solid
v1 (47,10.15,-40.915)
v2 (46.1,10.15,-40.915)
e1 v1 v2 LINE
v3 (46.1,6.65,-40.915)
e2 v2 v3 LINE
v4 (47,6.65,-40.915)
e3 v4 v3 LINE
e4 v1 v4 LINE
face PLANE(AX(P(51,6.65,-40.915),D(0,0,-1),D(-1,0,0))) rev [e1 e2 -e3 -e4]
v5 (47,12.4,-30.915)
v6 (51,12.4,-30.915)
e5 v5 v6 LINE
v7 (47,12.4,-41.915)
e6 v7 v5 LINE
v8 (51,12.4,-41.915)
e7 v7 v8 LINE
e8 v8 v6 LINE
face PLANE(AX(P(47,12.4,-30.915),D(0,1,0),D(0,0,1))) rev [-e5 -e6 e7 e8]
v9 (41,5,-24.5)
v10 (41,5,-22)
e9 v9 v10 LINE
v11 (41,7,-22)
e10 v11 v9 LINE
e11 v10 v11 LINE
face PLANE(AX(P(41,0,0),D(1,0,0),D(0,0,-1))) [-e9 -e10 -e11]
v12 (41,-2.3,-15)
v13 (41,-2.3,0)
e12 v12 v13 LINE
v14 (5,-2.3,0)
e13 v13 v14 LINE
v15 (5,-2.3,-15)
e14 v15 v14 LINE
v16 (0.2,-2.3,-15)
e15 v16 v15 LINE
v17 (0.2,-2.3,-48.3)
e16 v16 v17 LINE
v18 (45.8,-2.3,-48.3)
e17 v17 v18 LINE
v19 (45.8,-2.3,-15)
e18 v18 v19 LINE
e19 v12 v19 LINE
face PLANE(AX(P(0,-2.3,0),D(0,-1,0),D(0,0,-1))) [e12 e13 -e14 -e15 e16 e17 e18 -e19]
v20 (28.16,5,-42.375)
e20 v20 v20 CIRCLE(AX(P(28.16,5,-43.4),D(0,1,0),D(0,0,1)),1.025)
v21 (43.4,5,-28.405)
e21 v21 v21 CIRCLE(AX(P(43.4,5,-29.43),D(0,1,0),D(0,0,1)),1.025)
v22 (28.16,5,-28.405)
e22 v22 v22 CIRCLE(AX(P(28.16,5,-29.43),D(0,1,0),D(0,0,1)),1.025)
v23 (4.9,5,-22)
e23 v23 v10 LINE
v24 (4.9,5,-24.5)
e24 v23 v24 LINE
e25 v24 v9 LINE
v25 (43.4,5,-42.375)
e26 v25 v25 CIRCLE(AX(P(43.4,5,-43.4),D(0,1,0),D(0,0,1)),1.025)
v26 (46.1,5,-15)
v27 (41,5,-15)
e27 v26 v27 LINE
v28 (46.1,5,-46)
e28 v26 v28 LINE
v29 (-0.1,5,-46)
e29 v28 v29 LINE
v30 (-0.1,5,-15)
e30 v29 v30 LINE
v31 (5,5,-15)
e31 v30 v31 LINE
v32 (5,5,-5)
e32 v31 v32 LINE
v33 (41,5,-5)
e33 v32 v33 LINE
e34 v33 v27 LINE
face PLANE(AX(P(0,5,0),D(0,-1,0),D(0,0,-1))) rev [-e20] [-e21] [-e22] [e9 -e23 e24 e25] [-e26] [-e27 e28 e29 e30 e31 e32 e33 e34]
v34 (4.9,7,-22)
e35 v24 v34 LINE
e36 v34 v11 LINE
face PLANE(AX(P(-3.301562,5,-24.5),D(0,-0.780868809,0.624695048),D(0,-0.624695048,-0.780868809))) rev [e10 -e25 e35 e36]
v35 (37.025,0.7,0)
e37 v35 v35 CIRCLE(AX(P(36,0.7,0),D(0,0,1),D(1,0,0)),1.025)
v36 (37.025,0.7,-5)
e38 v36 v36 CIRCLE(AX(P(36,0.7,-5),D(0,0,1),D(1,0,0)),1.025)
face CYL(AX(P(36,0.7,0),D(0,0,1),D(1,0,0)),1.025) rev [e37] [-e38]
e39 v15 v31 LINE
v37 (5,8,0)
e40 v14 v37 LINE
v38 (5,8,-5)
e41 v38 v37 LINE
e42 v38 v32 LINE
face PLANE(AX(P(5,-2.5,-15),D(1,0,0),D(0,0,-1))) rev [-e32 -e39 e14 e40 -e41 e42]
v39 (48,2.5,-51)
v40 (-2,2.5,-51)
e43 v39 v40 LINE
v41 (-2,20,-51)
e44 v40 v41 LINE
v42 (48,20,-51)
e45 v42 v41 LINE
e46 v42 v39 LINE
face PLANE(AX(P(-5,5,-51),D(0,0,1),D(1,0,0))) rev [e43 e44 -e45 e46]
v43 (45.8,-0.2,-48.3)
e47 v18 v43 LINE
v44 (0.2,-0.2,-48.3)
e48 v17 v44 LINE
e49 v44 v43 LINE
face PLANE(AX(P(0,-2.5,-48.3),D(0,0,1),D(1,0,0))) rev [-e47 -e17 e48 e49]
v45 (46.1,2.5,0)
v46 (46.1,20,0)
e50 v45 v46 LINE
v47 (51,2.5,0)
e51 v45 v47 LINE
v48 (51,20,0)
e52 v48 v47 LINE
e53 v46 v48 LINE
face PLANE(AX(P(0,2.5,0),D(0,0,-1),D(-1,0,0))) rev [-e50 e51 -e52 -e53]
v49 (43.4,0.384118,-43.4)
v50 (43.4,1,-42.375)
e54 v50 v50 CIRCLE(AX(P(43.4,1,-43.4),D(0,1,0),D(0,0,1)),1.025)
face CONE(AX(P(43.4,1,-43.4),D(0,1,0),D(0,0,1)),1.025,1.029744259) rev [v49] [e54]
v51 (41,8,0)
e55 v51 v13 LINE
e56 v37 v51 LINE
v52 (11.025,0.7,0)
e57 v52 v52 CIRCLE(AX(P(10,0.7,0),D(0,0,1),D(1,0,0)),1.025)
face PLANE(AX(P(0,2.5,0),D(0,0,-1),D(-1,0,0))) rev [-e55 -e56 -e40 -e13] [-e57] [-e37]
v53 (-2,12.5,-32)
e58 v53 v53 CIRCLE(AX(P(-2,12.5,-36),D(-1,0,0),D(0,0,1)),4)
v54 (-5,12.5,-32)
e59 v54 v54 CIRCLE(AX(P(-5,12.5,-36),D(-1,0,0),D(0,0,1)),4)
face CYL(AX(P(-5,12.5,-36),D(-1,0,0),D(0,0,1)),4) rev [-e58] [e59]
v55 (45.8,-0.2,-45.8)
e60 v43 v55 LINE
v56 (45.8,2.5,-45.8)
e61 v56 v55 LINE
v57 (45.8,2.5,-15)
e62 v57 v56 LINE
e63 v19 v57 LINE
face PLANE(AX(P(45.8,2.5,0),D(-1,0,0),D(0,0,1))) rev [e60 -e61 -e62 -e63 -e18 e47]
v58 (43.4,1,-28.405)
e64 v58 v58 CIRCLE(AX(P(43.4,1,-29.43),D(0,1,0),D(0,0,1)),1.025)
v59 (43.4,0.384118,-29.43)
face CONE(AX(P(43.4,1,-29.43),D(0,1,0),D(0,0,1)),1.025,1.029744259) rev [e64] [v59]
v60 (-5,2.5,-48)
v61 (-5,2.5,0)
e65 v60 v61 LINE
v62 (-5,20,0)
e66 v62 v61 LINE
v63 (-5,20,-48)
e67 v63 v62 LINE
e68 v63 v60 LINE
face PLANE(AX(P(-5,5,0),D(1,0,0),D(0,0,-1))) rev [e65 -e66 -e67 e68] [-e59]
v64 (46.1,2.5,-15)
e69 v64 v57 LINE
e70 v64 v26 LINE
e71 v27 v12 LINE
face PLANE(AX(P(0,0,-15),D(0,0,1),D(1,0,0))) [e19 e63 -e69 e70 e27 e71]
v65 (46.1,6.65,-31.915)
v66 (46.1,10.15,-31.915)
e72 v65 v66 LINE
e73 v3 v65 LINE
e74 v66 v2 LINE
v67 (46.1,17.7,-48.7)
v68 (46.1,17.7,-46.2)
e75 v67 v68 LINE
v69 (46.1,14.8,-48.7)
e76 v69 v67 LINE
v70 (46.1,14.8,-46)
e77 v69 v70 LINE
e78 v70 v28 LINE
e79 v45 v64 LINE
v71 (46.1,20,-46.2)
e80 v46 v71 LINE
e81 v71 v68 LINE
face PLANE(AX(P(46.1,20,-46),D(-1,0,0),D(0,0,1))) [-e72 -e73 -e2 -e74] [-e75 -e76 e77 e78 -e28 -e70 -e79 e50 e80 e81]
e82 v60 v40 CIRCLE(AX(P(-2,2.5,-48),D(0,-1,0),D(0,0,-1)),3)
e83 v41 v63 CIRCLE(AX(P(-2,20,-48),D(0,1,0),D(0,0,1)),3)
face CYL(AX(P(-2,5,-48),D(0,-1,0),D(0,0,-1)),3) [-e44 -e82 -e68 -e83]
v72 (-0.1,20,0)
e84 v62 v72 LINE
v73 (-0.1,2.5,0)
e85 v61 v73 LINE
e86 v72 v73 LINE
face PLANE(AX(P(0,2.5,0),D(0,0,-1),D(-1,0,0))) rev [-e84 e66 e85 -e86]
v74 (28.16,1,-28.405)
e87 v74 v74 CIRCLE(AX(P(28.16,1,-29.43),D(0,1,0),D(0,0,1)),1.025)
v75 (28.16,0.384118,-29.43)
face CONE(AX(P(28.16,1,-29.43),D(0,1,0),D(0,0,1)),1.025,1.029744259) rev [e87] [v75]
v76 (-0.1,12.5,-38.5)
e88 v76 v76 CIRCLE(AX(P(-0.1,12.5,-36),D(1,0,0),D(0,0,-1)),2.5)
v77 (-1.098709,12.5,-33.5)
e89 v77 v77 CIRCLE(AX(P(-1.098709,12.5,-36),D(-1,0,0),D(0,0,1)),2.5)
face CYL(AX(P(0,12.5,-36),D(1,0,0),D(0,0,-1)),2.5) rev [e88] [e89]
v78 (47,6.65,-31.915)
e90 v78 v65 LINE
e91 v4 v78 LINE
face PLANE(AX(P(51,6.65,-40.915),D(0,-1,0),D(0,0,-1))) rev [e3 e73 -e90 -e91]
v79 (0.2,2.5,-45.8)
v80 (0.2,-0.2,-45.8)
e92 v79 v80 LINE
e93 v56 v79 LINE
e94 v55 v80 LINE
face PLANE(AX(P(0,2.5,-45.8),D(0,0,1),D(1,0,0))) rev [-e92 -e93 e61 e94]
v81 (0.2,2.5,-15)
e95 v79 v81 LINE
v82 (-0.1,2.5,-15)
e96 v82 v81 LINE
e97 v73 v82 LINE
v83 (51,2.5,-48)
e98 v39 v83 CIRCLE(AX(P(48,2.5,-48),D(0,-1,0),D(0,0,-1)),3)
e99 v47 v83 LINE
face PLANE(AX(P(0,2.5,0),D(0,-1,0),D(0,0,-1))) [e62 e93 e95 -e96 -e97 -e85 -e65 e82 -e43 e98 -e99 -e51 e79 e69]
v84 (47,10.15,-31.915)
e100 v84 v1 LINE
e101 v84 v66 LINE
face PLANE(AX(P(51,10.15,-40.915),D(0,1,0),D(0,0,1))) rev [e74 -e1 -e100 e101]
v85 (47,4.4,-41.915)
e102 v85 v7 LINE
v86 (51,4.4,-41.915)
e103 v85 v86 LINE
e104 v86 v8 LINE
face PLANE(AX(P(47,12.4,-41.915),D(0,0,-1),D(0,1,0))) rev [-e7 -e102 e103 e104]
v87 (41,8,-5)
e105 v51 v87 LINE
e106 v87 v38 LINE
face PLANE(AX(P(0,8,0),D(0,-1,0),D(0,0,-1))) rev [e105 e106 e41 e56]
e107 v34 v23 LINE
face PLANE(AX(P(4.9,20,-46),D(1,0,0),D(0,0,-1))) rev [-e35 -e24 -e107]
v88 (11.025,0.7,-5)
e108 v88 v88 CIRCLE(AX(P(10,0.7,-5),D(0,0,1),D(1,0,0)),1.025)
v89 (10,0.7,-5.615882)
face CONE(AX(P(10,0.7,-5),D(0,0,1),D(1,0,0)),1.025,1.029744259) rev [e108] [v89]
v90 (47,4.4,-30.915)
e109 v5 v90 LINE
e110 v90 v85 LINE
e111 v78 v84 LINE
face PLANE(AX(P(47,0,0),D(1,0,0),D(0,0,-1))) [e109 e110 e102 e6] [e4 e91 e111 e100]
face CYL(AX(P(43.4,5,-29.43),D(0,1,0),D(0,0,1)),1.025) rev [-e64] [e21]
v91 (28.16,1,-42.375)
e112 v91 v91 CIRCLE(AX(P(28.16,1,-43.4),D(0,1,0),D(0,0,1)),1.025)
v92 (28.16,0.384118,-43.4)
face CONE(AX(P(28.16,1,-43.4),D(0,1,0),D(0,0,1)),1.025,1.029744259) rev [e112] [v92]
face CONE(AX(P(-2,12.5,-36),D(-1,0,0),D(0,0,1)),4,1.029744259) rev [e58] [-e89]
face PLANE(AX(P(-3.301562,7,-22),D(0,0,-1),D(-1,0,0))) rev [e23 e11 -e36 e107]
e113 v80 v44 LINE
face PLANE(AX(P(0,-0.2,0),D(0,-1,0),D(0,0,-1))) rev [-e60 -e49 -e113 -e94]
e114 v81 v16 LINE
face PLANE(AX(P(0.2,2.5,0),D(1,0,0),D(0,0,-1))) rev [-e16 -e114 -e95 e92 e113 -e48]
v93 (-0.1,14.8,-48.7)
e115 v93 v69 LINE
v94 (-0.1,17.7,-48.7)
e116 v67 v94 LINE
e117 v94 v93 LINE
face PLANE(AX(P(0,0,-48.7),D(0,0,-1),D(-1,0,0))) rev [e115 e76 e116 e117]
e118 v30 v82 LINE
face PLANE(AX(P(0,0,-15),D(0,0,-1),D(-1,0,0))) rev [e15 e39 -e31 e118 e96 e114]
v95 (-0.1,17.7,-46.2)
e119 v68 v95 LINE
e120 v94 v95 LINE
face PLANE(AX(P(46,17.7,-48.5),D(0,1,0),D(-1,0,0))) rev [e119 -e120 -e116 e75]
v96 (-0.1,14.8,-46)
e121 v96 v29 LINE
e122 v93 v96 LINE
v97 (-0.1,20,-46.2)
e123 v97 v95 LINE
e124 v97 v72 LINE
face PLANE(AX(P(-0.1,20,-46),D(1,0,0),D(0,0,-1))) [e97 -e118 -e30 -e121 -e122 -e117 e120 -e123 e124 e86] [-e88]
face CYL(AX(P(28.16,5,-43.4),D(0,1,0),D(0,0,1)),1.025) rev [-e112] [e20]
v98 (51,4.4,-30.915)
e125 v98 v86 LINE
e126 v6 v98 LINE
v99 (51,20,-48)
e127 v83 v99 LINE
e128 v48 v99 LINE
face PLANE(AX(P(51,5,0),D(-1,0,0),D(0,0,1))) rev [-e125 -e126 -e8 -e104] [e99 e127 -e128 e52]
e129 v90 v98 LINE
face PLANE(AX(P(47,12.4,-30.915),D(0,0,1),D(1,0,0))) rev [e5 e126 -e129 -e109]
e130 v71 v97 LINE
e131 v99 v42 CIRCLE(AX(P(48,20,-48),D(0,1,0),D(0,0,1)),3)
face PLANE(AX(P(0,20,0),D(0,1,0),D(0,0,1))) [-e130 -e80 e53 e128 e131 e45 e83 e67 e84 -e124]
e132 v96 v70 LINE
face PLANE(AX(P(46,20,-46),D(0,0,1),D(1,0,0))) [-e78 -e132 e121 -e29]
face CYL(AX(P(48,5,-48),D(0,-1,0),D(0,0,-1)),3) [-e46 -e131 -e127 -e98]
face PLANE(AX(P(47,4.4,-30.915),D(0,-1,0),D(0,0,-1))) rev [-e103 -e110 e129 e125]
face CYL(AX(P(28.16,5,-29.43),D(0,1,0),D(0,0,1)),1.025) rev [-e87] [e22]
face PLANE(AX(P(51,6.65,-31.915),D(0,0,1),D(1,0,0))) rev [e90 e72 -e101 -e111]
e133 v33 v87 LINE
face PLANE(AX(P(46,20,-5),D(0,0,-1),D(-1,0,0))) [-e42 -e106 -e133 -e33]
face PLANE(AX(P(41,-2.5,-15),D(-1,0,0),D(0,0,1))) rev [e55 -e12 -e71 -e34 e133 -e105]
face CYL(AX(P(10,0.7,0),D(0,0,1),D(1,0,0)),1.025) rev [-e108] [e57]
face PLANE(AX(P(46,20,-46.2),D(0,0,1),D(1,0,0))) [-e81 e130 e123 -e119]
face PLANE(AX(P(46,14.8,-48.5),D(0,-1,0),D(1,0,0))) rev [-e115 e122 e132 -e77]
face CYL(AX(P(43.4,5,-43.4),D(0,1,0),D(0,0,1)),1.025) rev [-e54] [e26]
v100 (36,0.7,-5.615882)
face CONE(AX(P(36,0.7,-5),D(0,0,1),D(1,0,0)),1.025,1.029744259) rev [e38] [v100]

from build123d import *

# Parameters (mm, degrees)
SKETCH1_W                    = 46
SKETCH1_H                    = 46
BOSS_EXTRUDE1_DEPTH          = 2.5
SKETCH2_W                    = 46
SKETCH2_H                    = 48.5
BOSS_EXTRUDE2_DEPTH          = 2.5
SKETCH5_W                    = 56
SKETCH5_H                    = 51
BOSS_EXTRUDE5_DEPTH          = 2.5
SKETCH6_W                    = 56
SKETCH6_H                    = 51
SKETCH6_W_2                  = 46
SKETCH6_H_2                  = 41
BOSS_EXTRUDE6_DEPTH          = 15
M2_5X0_45_TAPPED_HOLE1_D     = 2.05
M2_5X0_45_TAPPED_HOLE1_DEPTH = 4
M2_5X0_45_TAPPED_HOLE1_TIP   = 0.615882135
F_5_0MM_DOWEL_HOLE1_D        = 5
F_5_0MM_DOWEL_HOLE1_DEPTH    = 6.35
F_5_0MM_DOWEL_HOLE1_TIP      = 1.502151548
F_8_0MM_DOWEL_HOLE1_D        = 8
F_8_0MM_DOWEL_HOLE1_DEPTH    = 3
F_8_0MM_DOWEL_HOLE1_TIP      = 2.403442476
SKETCH15_W                   = 5
SKETCH15_H                   = 22.5
CUT_EXTRUDE1_DEPTH           = 15
SKETCH16_W                   = 46
SKETCH16_H                   = 2.5
CUT_EXTRUDE2_DEPTH           = 2.5
FILLET1_R                    = 3
MOVE_FACE1_BY                = 0.2
MOVE_FACE1_2_BY              = 0.2
MOVE_FACE1_3_BY              = 0.2
MOVE_FACE1_4_BY              = 0.2
MOVE_FACE1_5_BY              = 0.2
MOVE_FACE1_6_BY              = 0.2
MOVE_FACE1_7_BY              = 0.2
MOVE_FACE1_8_BY              = 0.2
MOVE_FACE2_BY                = 0.2
MOVE_FACE2_2_BY              = 0.2
M2_5X0_45_TAPPED_HOLE2_D     = 2.05
M2_5X0_45_TAPPED_HOLE2_DEPTH = 5
M2_5X0_45_TAPPED_HOLE2_TIP   = 0.615882135
SKETCH20_W                   = 9
SKETCH20_H                   = 3.5
CUT_EXTRUDE4_DEPTH           = 75.846509605
SKETCH21_W                   = 11
SKETCH21_H                   = 8
CUT_EXTRUDE5_DEPTH           = 4
MOVE_START                   = -0.1
MOVE_FACE3_OUTLINE_R         = 2.5
MOVE_FACE3_DEPTH             = 0.1
MOVE_START_2                 = 46
MOVE_FACE3_2_OUTLINE_W       = 3.5
MOVE_FACE3_2_OUTLINE_H       = 9
MOVE_FACE3_2_DEPTH           = 0.1
SKETCH17_W                   = 36
SKETCH17_H                   = 5
CUT_EXTRUDE7_DEPTH           = 12
BOSS_EXTRUDE7_START          = 5
BOSS_EXTRUDE7_DEPTH          = 36.1


# Read off the part's stored shape, not the designer's step: Move Face3
with BuildPart() as part:
    # Sketch1 → Boss-Extrude1 (new body)
    with BuildSketch(Plane(origin=(0, 0, 0), x_dir=(1, 0, 0), z_dir=(0, 1, 0))):
        with Locations((23, 23)):
            Rectangle(SKETCH1_W, SKETCH1_H)
    extrude(amount=BOSS_EXTRUDE1_DEPTH)

    # Sketch2 → Boss-Extrude2 (add)
    with BuildSketch(Plane.XZ):
        with Locations((23, -24.25)):
            Rectangle(SKETCH2_W, SKETCH2_H)
    extrude(amount=BOSS_EXTRUDE2_DEPTH)

    # Sketch5 → Boss-Extrude5 (add)
    with BuildSketch(Plane(origin=(0, 2.5, 0), x_dir=(1, 0, 0), z_dir=(0, 1, 0))):
        with Locations((23, 25.5)):
            Rectangle(SKETCH5_W, SKETCH5_H)
    extrude(amount=BOSS_EXTRUDE5_DEPTH)

    # Sketch6 → Boss-Extrude6 (add)
    with BuildSketch(Plane(origin=(0, 5, 0), x_dir=(1, 0, 0), z_dir=(0, 1, 0))):
        with Locations((23, 25.5)):
            Rectangle(SKETCH6_W, SKETCH6_H)
        with Locations((23, 25.5)):
            Rectangle(SKETCH6_W_2, SKETCH6_H_2, mode=Mode.SUBTRACT)
    extrude(amount=BOSS_EXTRUDE6_DEPTH)

    # M2.5x0.45 Tapped Hole1
    with Locations(Plane(origin=(0, 5, 0), x_dir=(1, 0, 0), z_dir=(0, 1, 0))):
        with Locations((43.4, 43.4), (28.16, 43.4), (28.16, 29.43), (43.4, 29.43)):
            Hole(M2_5X0_45_TAPPED_HOLE1_D / 2, depth=M2_5X0_45_TAPPED_HOLE1_DEPTH)
            with Locations((0, 0, -(M2_5X0_45_TAPPED_HOLE1_DEPTH + M2_5X0_45_TAPPED_HOLE1_TIP / 2))):  # 118° drill point
                Cone(0, M2_5X0_45_TAPPED_HOLE1_D / 2, M2_5X0_45_TAPPED_HOLE1_TIP, mode=Mode.SUBTRACT)

    # Ø5.0mm Dowel Hole1
    with Locations(Plane(origin=(0, 0, 0), x_dir=(0, 0, -1), z_dir=(1, 0, 0))):
        with Locations((36, 12.5)):
            Hole(F_5_0MM_DOWEL_HOLE1_D / 2, depth=F_5_0MM_DOWEL_HOLE1_DEPTH)
            with Locations((0, 0, -(F_5_0MM_DOWEL_HOLE1_DEPTH + F_5_0MM_DOWEL_HOLE1_TIP / 2))):  # 118° drill point
                Cone(0, F_5_0MM_DOWEL_HOLE1_D / 2, F_5_0MM_DOWEL_HOLE1_TIP, mode=Mode.SUBTRACT)

    # Ø8.0mm Dowel Hole1
    with Locations(Plane.ZY.offset(5)):
        with Locations((-36, 12.5)):
            Hole(F_8_0MM_DOWEL_HOLE1_D / 2, depth=F_8_0MM_DOWEL_HOLE1_DEPTH)
            with Locations((0, 0, -(F_8_0MM_DOWEL_HOLE1_DEPTH + F_8_0MM_DOWEL_HOLE1_TIP / 2))):  # 118° drill point
                Cone(0, F_8_0MM_DOWEL_HOLE1_D / 2, F_8_0MM_DOWEL_HOLE1_TIP, mode=Mode.SUBTRACT)

    # Sketch15 → Cut-Extrude1 (cut)
    with BuildSketch(Plane.XY):
        with Locations((43.5, 8.75)):
            Rectangle(SKETCH15_W, SKETCH15_H)
        with Locations((2.5, 8.75)):
            Rectangle(SKETCH15_W, SKETCH15_H)
    extrude(amount=-CUT_EXTRUDE1_DEPTH, mode=Mode.SUBTRACT)

    # Sketch16 → Cut-Extrude2 (cut)
    with BuildSketch(Plane.XY.offset(-46)):
        with Locations((23, 16.25)):
            Rectangle(SKETCH16_W, SKETCH16_H)
    extrude(amount=-CUT_EXTRUDE2_DEPTH, mode=Mode.SUBTRACT)

    # Fillet1
    fillet1_edges = [part.edges().sort_by_distance(p)[0] for p in [
        (-5, 11.25, -51),
        (51, 11.25, -51),
    ]]
    fillet(fillet1_edges, radius=FILLET1_R)

    # Move Face1: a face moved inward by 0.2
    extrude(part.faces().sort_by_distance((23, -2.5, -25.457352235))[0], amount=MOVE_FACE1_BY, dir=(0, 1, 0), mode=Mode.SUBTRACT)

    # Move Face1 2: a face moved inward by 0.2
    extrude(part.faces().sort_by_distance((23, 16.25, -48.5))[0], amount=MOVE_FACE1_2_BY, dir=(0, 0, -1), mode=Mode.SUBTRACT)

    # Move Face1 3: a face moved inward by 0.2
    extrude(part.faces().sort_by_distance((23, 17.5, -47.25))[0], amount=MOVE_FACE1_3_BY, dir=(0, 1, 0), mode=Mode.SUBTRACT)

    # Move Face1 4: a face moved inward by 0.2
    extrude(part.faces().sort_by_distance((23, 18.75, -46))[0], amount=MOVE_FACE1_4_BY, dir=(0, 0, -1), mode=Mode.SUBTRACT)

    # Move Face1 5: a face moved inward by 0.2
    extrude(part.faces().sort_by_distance((23, 0, -47.25))[0], amount=MOVE_FACE1_5_BY, dir=(0, -1, 0), mode=Mode.SUBTRACT)

    # Move Face1 6: a face moved inward by 0.2
    extrude(part.faces().sort_by_distance((23, 1.25, -46))[0], amount=MOVE_FACE1_6_BY, dir=(0, 0, 1), mode=Mode.SUBTRACT)

    # Move Face1 7: a face moved inward by 0.2
    extrude(part.faces().sort_by_distance((23, -1.25, -48.5))[0], amount=MOVE_FACE1_7_BY, dir=(0, 0, 1), mode=Mode.SUBTRACT)

    # Move Face1 8: a face moved inward by 0.2
    extrude(part.faces().sort_by_distance((23, 15, -47.25))[0], amount=MOVE_FACE1_8_BY, dir=(0, -1, 0), mode=Mode.SUBTRACT)

    # Move Face2: a face moved inward by 0.2
    extrude(part.faces().sort_by_distance((46, 0.053703704, -30.970987654))[0], amount=MOVE_FACE2_BY, dir=(-1, 0, 0), mode=Mode.SUBTRACT)

    # Move Face2 2: a face moved inward by 0.2
    extrude(part.faces().sort_by_distance((0, 0.053703704, -30.970987654))[0], amount=MOVE_FACE2_2_BY, dir=(1, 0, 0), mode=Mode.SUBTRACT)

    # M2.5x0.45 Tapped Hole2
    with Locations(Plane.XY):
        with Locations((10, 0.7), (36, 0.7)):
            Hole(M2_5X0_45_TAPPED_HOLE2_D / 2, depth=M2_5X0_45_TAPPED_HOLE2_DEPTH)
            with Locations((0, 0, -(M2_5X0_45_TAPPED_HOLE2_DEPTH + M2_5X0_45_TAPPED_HOLE2_TIP / 2))):  # 118° drill point
                Cone(0, M2_5X0_45_TAPPED_HOLE2_D / 2, M2_5X0_45_TAPPED_HOLE2_TIP, mode=Mode.SUBTRACT)

    # Sketch20 → Cut-Extrude4 (cut, through all)
    with BuildSketch(Plane.ZY.offset(-46)):
        with Locations((-36.415, 8.4)):
            Rectangle(SKETCH20_W, SKETCH20_H)
    extrude(amount=-CUT_EXTRUDE4_DEPTH, mode=Mode.SUBTRACT)

    # Sketch21 → Cut-Extrude5 (cut)
    with BuildSketch(Plane(origin=(51, 0, 0), x_dir=(0, 0, -1), z_dir=(1, 0, 0))):
        with Locations((36.415, 8.4)):
            Rectangle(SKETCH21_W, SKETCH21_H)
    extrude(amount=-CUT_EXTRUDE5_DEPTH, mode=Mode.SUBTRACT)

    # Move Face3 outline → Move Face3 (cut)
    with BuildSketch(Plane.YZ.offset(MOVE_START)):
        Polygon((5, -46), (14.8, -46), (14.8, -48.7), (17.7, -48.7), (17.7, -46.2), (20, -46.2), (20, 0), (2.5, 0), (2.5, -15), (5, -15), align=None)
        with Locations((12.5, -36)):
            Circle(MOVE_FACE3_OUTLINE_R, mode=Mode.SUBTRACT)
    extrude(amount=MOVE_FACE3_DEPTH, mode=Mode.SUBTRACT)

    # Move Face3 2 outline → Move Face3 2 (cut)
    with BuildSketch(Plane.YZ.offset(MOVE_START_2)):
        Polygon((5, -46), (14.8, -46), (14.8, -48.7), (17.7, -48.7), (17.7, -46.2), (20, -46.2), (20, 0), (2.5, 0), (2.5, -15), (5, -15), align=None)
        with Locations((8.4, -36.415)):
            Rectangle(MOVE_FACE3_2_OUTLINE_W, MOVE_FACE3_2_OUTLINE_H, mode=Mode.SUBTRACT)
    extrude(amount=MOVE_FACE3_2_DEPTH, mode=Mode.SUBTRACT)

    # Sketch17 → Cut-Extrude7 (cut)
    with BuildSketch(Plane(origin=(0, 20, 0), x_dir=(1, 0, 0), z_dir=(0, 1, 0))):
        with Locations((23, 2.5)):
            Rectangle(SKETCH17_W, SKETCH17_H)
    extrude(amount=-CUT_EXTRUDE7_DEPTH, mode=Mode.SUBTRACT)

    # Sketch8 → Boss-Extrude7 (add)
    with BuildSketch(Plane.ZY.offset(-46).offset(BOSS_EXTRUDE7_START)):
        Polygon((-22, 5), (-24.5, 5), (-22, 7), align=None)
    extrude(amount=BOSS_EXTRUDE7_DEPTH)


solid = part.part
